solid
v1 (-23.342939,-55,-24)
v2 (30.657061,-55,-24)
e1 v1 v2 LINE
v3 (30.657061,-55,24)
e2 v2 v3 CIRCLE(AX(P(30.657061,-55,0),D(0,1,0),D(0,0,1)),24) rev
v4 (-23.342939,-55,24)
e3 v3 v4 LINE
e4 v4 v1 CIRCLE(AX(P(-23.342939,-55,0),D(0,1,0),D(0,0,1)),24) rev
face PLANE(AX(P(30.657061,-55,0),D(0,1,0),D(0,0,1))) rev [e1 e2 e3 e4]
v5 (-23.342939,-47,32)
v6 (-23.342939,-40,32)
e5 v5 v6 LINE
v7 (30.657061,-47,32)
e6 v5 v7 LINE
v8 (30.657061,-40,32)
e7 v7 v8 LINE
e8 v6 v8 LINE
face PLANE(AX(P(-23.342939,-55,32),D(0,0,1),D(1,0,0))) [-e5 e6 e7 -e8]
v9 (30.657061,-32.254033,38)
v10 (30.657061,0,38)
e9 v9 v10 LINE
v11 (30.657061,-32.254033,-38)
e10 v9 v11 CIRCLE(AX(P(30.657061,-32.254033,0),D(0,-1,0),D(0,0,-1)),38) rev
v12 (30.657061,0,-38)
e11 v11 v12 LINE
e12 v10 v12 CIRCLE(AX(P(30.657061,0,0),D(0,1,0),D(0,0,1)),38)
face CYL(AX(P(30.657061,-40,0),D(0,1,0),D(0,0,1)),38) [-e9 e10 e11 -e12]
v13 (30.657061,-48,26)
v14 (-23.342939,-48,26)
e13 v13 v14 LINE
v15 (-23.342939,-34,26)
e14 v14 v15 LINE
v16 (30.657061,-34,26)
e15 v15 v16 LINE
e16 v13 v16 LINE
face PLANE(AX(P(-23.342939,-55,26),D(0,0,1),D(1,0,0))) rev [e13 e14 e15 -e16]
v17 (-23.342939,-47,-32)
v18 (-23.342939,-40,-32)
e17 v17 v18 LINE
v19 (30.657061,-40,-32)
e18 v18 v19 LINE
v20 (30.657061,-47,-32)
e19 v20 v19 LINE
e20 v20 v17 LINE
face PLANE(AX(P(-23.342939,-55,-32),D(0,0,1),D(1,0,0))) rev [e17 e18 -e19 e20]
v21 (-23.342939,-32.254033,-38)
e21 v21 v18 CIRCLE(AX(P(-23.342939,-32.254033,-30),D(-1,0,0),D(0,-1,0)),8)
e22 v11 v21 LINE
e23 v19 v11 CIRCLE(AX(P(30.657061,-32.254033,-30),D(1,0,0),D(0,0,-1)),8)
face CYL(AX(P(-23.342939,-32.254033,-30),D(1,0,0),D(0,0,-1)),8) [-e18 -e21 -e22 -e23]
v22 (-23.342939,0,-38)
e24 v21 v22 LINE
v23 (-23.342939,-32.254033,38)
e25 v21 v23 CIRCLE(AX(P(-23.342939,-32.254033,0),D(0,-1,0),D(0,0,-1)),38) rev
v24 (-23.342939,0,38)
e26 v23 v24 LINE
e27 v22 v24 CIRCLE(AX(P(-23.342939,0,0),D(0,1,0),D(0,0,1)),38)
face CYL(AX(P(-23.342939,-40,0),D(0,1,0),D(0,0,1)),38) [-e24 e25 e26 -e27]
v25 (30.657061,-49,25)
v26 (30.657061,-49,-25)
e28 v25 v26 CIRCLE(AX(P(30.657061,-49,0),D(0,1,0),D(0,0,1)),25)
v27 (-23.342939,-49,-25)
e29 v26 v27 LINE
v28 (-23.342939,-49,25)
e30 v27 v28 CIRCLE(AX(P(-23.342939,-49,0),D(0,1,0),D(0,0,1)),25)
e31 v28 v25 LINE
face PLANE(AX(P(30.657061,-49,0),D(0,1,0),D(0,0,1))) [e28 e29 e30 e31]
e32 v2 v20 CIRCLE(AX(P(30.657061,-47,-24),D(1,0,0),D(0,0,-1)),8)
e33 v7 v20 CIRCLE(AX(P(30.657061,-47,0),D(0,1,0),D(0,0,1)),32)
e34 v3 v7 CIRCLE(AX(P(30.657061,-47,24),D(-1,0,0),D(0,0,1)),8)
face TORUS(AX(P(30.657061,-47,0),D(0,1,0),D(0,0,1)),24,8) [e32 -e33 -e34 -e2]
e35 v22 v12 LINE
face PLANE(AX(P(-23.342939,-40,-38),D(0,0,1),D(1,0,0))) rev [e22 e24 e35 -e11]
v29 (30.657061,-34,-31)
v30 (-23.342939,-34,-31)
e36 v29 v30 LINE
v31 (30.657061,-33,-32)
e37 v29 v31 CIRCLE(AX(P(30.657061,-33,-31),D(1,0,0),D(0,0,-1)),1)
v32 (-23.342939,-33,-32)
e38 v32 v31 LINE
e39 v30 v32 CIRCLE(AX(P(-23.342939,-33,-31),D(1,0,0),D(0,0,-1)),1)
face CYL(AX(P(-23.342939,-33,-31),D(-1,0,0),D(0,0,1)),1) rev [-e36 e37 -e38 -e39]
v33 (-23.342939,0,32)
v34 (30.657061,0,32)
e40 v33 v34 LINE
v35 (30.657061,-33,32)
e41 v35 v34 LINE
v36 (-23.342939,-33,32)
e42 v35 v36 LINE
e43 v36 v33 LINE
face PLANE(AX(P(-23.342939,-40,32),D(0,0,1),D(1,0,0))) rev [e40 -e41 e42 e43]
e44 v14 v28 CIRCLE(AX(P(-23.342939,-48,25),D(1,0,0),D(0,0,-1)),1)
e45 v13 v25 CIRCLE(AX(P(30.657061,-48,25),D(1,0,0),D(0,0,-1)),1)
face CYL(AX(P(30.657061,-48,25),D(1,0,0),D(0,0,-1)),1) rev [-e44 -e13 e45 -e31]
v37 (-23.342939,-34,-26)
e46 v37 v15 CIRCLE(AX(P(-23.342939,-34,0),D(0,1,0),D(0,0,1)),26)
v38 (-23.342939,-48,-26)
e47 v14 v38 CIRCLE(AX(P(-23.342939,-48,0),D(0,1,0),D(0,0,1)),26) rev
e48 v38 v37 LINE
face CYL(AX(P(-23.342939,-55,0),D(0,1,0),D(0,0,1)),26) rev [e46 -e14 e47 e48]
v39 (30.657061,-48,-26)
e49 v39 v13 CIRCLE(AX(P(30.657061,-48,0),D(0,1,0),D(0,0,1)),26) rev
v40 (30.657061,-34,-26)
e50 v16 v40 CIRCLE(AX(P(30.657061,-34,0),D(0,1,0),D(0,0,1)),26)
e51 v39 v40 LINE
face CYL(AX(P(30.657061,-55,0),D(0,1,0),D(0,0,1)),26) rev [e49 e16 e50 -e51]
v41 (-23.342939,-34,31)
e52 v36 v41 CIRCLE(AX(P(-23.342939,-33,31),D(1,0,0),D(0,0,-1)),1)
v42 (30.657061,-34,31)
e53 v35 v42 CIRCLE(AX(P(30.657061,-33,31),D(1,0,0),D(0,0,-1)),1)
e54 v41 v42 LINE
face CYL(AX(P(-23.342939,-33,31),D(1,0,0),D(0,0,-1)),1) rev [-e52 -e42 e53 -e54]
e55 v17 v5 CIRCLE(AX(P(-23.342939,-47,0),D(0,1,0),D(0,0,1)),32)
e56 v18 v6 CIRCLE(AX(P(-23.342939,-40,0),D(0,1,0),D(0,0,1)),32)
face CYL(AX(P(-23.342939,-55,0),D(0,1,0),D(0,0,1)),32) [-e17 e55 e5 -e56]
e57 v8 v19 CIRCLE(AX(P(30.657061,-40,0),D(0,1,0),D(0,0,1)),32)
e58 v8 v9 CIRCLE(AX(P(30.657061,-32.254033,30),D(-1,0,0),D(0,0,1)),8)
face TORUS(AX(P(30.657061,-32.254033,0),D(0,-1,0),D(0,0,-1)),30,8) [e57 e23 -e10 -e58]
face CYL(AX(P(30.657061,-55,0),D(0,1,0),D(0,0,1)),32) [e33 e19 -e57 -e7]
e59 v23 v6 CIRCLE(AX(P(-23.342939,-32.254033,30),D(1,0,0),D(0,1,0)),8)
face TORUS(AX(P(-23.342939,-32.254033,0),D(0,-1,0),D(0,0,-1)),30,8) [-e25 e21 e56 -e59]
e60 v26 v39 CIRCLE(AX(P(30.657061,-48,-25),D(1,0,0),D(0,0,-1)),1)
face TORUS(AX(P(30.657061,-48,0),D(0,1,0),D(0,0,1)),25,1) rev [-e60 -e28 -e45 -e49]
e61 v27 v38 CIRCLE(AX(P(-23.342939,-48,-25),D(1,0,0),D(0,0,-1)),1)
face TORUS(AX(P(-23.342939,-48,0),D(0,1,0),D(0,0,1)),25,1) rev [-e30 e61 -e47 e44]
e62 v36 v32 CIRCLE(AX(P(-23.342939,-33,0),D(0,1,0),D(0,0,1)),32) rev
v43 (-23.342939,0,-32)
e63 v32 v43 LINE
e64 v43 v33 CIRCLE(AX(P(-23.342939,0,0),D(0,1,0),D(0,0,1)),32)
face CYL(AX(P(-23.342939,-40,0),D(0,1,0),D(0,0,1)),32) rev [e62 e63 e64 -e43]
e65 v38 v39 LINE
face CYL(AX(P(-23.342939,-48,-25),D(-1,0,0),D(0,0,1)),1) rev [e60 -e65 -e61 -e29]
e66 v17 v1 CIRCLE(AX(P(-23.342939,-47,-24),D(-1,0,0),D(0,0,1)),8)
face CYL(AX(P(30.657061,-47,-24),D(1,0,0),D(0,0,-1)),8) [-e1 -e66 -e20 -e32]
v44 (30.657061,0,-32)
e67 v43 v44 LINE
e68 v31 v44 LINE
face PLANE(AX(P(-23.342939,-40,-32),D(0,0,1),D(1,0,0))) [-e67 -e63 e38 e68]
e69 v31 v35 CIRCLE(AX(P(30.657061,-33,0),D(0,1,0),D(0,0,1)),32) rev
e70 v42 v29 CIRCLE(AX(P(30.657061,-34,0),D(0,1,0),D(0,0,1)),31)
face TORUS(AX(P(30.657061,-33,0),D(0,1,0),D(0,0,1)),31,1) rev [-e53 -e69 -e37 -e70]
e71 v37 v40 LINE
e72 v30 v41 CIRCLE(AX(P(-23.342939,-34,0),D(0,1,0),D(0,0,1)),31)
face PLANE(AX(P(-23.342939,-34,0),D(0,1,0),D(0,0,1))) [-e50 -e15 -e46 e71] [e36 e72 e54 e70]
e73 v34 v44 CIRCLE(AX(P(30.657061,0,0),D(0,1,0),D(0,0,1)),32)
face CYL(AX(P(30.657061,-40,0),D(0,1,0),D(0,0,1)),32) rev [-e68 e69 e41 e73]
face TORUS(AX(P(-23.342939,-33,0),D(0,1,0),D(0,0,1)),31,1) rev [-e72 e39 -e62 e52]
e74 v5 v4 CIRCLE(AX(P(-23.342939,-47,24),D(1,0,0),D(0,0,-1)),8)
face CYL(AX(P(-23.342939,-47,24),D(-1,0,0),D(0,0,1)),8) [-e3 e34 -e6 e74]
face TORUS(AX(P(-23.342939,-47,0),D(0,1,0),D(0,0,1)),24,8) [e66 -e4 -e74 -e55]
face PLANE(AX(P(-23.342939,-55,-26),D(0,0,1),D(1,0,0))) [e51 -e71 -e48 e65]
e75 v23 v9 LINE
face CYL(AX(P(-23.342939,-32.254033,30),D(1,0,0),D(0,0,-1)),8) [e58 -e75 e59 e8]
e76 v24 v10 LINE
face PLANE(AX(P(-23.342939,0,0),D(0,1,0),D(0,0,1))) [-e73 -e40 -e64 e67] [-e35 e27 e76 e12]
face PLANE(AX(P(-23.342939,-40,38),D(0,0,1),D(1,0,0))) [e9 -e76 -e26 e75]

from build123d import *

# Parameters (mm, degrees)
EXTRUDE_1_DEPTH = 40
EXTRUDE_2_DEPTH = 55
SHELL_1_T       = -6
FILLET_1_R      = 8
FILLET_3_R      = 1


with BuildPart() as part:
    # 스케치1 → 보스-돌출1 (new body)
    with BuildSketch(Plane(origin=(0, 0, 0), x_dir=(1, 0, 0), z_dir=(0, 1, 0))):
        with BuildLine():
            Line((-23.342939481, 38), (30.657060519, 38))
            ThreePointArc((30.657060519, 38), (68.657060519, 0), (30.657060519, -38))
            Line((30.657060519, -38), (-23.342939481, -38))
            ThreePointArc((-23.342939481, -38), (-61.342939481, 0), (-23.342939481, 38))
        make_face()
    extrude(amount=-EXTRUDE_1_DEPTH)

    # 스케치1<3> → 보스-돌출2 (add)
    with BuildSketch(Plane(origin=(0, 0, 0), x_dir=(1, 0, 0), z_dir=(0, 1, 0))):
        with BuildLine():
            Line((-23.342939481, 32), (30.657060519, 32))
            ThreePointArc((30.657060519, 32), (62.657060519, 0), (30.657060519, -32))
            Line((30.657060519, -32), (-23.342939481, -32))
            ThreePointArc((-23.342939481, -32), (-55.342939481, 0), (-23.342939481, 32))
        make_face()
    extrude(amount=-EXTRUDE_2_DEPTH)

    # 쉘1
    shell_1_openings = [part.faces().sort_by_distance(p)[0] for p in [
        (3.657060519, 0, 0),
    ]]
    offset(amount=SHELL_1_T, openings=shell_1_openings, kind=Kind.INTERSECTION)

    # 필렛1
    # the kernel refuses this fillet: 8 mm, written as the material it takes off along each edge
    with BuildSketch(Plane(origin=(30.657060519, -40, 0), x_dir=(0, 0, -1), z_dir=(-1, 0, 0))) as fillet_1_piece_1:
        with BuildLine():
            CenterArc((30, -7.745966692), FILLET_1_R, 0, 75.522487814)
            Line((32, 0), (32.04, 0.154919334))
            ThreePointArc((32.04, 0.154919334), (35, 0.16), (38, 0.16))
            Line((38, 0.16), (38.16, 0))
            Line((38.16, 0), (38.16, -7.745966692))
            Line((38.16, -7.745966692), (38, -7.745966692))
        make_face()
    revolve(axis=Axis((30.657060519, -40, 0), (0, -1, 0)), revolution_arc=180, mode=Mode.SUBTRACT)
    with BuildSketch(Plane(origin=(-23.342939481, -40, -38), x_dir=(0, 0, 1), z_dir=(1, 0, 0))) as fillet_1_piece_2:
        with BuildLine():
            CenterArc((8, -7.745966692), FILLET_1_R, 104.477512186, 75.522487814)
            Line((0, -7.745966692), (-0.16, -7.745966692))
            Line((-0.16, -7.745966692), (-0.16, 0))
            Line((-0.16, 0), (0, 0.16))
            ThreePointArc((0, 0.16), (3, 0.16), (5.96, 0.154919334))
            Line((5.96, 0.154919334), (6, 0))
        make_face()
    extrude(amount=54, mode=Mode.SUBTRACT)
    with BuildSketch(Plane(origin=(30.657060519, -55, 0), x_dir=(0, 0, -1), z_dir=(-1, 0, 0))) as fillet_1_piece_3:
        with BuildLine():
            CenterArc((32 - FILLET_1_R, -FILLET_1_R), FILLET_1_R, 0, 90)
            Line((32 - FILLET_1_R, 0), (32 - FILLET_1_R, FILLET_1_R * 0.02))
            Line((32 - FILLET_1_R, FILLET_1_R * 0.02), (32 + FILLET_1_R * 0.02, FILLET_1_R * 0.02))
            Line((32 + FILLET_1_R * 0.02, FILLET_1_R * 0.02), (32 + FILLET_1_R * 0.02, -FILLET_1_R))
            Line((32 + FILLET_1_R * 0.02, -FILLET_1_R), (32, -FILLET_1_R))
        make_face()
    revolve(axis=Axis((30.657060519, -55, 0), (0, -1, 0)), revolution_arc=180, mode=Mode.SUBTRACT)
    with BuildSketch(Plane(origin=(30.657060519, -55, 32), x_dir=(0, 1, 0), z_dir=(-1, 0, 0)), Plane(origin=(-23.342939481, -55, -32), x_dir=(0, 1, 0), z_dir=(1, 0, 0))) as fillet_1_piece_4:
        with BuildLine():
            CenterArc((FILLET_1_R, FILLET_1_R), FILLET_1_R, 180, 90)
            Line((0, FILLET_1_R), (-FILLET_1_R * 0.02, FILLET_1_R))
            Line((-FILLET_1_R * 0.02, FILLET_1_R), (-FILLET_1_R * 0.02, -FILLET_1_R * 0.02))
            Line((-FILLET_1_R * 0.02, -FILLET_1_R * 0.02), (FILLET_1_R, -FILLET_1_R * 0.02))
            Line((FILLET_1_R, -FILLET_1_R * 0.02), (FILLET_1_R, 0))
        make_face()
    extrude(amount=54, mode=Mode.SUBTRACT)
    with BuildSketch(Plane(origin=(-23.342939481, -55, 0), x_dir=(0, 0, 1), z_dir=(1, 0, 0))) as fillet_1_piece_5:
        with BuildLine():
            CenterArc((32 - FILLET_1_R, -FILLET_1_R), FILLET_1_R, 0, 90)
            Line((32 - FILLET_1_R, 0), (32 - FILLET_1_R, FILLET_1_R * 0.02))
            Line((32 - FILLET_1_R, FILLET_1_R * 0.02), (32 + FILLET_1_R * 0.02, FILLET_1_R * 0.02))
            Line((32 + FILLET_1_R * 0.02, FILLET_1_R * 0.02), (32 + FILLET_1_R * 0.02, -FILLET_1_R))
            Line((32 + FILLET_1_R * 0.02, -FILLET_1_R), (32, -FILLET_1_R))
        make_face()
    revolve(axis=Axis((-23.342939481, -55, 0), (0, -1, 0)), revolution_arc=180, mode=Mode.SUBTRACT)
    with BuildSketch(Plane(origin=(-23.342939481, -40, 0), x_dir=(0, 0, 1), z_dir=(1, 0, 0))) as fillet_1_piece_6:
        with BuildLine():
            CenterArc((30, -7.745966692), FILLET_1_R, 0, 75.522487814)
            Line((32, 0), (32.04, 0.154919334))
            ThreePointArc((32.04, 0.154919334), (35, 0.16), (38, 0.16))
            Line((38, 0.16), (38.16, 0))
            Line((38.16, 0), (38.16, -7.745966692))
            Line((38.16, -7.745966692), (38, -7.745966692))
        make_face()
    revolve(axis=Axis((-23.342939481, -40, 0), (0, -1, 0)), revolution_arc=180, mode=Mode.SUBTRACT)
    with BuildSketch(Plane(origin=(30.657060519, -40, 38), x_dir=(0, 1, 0), z_dir=(-1, 0, 0))) as fillet_1_piece_7:
        with BuildLine():
            CenterArc((7.745966692, 8), FILLET_1_R, 194.477512186, 75.522487814)
            Line((0, 6), (-0.154919334, 5.96))
            ThreePointArc((-0.154919334, 5.96), (-0.16, 3), (-0.16, 0))
            Line((-0.16, 0), (0, -0.16))
            Line((0, -0.16), (7.745966692, -0.16))
            Line((7.745966692, -0.16), (7.745966692, 0))
        make_face()
    extrude(amount=54, mode=Mode.SUBTRACT)

    # 필렛3
    fillet_3_edges = [part.edges().sort_by_distance(p)[0] for p in [
        (3.657060519, -34, -32),
        (-55.342939481, -34, 0),
        (62.657060519, -34, 0),
        (3.657060519, -34, 32),
        (56.657060519, -49, 0),
        (3.657060519, -49, 26),
        (-49.342939481, -49, 0),
        (3.657060519, -49, -26),
    ]]
    fillet(fillet_3_edges, radius=FILLET_3_R)


solid = part.part
